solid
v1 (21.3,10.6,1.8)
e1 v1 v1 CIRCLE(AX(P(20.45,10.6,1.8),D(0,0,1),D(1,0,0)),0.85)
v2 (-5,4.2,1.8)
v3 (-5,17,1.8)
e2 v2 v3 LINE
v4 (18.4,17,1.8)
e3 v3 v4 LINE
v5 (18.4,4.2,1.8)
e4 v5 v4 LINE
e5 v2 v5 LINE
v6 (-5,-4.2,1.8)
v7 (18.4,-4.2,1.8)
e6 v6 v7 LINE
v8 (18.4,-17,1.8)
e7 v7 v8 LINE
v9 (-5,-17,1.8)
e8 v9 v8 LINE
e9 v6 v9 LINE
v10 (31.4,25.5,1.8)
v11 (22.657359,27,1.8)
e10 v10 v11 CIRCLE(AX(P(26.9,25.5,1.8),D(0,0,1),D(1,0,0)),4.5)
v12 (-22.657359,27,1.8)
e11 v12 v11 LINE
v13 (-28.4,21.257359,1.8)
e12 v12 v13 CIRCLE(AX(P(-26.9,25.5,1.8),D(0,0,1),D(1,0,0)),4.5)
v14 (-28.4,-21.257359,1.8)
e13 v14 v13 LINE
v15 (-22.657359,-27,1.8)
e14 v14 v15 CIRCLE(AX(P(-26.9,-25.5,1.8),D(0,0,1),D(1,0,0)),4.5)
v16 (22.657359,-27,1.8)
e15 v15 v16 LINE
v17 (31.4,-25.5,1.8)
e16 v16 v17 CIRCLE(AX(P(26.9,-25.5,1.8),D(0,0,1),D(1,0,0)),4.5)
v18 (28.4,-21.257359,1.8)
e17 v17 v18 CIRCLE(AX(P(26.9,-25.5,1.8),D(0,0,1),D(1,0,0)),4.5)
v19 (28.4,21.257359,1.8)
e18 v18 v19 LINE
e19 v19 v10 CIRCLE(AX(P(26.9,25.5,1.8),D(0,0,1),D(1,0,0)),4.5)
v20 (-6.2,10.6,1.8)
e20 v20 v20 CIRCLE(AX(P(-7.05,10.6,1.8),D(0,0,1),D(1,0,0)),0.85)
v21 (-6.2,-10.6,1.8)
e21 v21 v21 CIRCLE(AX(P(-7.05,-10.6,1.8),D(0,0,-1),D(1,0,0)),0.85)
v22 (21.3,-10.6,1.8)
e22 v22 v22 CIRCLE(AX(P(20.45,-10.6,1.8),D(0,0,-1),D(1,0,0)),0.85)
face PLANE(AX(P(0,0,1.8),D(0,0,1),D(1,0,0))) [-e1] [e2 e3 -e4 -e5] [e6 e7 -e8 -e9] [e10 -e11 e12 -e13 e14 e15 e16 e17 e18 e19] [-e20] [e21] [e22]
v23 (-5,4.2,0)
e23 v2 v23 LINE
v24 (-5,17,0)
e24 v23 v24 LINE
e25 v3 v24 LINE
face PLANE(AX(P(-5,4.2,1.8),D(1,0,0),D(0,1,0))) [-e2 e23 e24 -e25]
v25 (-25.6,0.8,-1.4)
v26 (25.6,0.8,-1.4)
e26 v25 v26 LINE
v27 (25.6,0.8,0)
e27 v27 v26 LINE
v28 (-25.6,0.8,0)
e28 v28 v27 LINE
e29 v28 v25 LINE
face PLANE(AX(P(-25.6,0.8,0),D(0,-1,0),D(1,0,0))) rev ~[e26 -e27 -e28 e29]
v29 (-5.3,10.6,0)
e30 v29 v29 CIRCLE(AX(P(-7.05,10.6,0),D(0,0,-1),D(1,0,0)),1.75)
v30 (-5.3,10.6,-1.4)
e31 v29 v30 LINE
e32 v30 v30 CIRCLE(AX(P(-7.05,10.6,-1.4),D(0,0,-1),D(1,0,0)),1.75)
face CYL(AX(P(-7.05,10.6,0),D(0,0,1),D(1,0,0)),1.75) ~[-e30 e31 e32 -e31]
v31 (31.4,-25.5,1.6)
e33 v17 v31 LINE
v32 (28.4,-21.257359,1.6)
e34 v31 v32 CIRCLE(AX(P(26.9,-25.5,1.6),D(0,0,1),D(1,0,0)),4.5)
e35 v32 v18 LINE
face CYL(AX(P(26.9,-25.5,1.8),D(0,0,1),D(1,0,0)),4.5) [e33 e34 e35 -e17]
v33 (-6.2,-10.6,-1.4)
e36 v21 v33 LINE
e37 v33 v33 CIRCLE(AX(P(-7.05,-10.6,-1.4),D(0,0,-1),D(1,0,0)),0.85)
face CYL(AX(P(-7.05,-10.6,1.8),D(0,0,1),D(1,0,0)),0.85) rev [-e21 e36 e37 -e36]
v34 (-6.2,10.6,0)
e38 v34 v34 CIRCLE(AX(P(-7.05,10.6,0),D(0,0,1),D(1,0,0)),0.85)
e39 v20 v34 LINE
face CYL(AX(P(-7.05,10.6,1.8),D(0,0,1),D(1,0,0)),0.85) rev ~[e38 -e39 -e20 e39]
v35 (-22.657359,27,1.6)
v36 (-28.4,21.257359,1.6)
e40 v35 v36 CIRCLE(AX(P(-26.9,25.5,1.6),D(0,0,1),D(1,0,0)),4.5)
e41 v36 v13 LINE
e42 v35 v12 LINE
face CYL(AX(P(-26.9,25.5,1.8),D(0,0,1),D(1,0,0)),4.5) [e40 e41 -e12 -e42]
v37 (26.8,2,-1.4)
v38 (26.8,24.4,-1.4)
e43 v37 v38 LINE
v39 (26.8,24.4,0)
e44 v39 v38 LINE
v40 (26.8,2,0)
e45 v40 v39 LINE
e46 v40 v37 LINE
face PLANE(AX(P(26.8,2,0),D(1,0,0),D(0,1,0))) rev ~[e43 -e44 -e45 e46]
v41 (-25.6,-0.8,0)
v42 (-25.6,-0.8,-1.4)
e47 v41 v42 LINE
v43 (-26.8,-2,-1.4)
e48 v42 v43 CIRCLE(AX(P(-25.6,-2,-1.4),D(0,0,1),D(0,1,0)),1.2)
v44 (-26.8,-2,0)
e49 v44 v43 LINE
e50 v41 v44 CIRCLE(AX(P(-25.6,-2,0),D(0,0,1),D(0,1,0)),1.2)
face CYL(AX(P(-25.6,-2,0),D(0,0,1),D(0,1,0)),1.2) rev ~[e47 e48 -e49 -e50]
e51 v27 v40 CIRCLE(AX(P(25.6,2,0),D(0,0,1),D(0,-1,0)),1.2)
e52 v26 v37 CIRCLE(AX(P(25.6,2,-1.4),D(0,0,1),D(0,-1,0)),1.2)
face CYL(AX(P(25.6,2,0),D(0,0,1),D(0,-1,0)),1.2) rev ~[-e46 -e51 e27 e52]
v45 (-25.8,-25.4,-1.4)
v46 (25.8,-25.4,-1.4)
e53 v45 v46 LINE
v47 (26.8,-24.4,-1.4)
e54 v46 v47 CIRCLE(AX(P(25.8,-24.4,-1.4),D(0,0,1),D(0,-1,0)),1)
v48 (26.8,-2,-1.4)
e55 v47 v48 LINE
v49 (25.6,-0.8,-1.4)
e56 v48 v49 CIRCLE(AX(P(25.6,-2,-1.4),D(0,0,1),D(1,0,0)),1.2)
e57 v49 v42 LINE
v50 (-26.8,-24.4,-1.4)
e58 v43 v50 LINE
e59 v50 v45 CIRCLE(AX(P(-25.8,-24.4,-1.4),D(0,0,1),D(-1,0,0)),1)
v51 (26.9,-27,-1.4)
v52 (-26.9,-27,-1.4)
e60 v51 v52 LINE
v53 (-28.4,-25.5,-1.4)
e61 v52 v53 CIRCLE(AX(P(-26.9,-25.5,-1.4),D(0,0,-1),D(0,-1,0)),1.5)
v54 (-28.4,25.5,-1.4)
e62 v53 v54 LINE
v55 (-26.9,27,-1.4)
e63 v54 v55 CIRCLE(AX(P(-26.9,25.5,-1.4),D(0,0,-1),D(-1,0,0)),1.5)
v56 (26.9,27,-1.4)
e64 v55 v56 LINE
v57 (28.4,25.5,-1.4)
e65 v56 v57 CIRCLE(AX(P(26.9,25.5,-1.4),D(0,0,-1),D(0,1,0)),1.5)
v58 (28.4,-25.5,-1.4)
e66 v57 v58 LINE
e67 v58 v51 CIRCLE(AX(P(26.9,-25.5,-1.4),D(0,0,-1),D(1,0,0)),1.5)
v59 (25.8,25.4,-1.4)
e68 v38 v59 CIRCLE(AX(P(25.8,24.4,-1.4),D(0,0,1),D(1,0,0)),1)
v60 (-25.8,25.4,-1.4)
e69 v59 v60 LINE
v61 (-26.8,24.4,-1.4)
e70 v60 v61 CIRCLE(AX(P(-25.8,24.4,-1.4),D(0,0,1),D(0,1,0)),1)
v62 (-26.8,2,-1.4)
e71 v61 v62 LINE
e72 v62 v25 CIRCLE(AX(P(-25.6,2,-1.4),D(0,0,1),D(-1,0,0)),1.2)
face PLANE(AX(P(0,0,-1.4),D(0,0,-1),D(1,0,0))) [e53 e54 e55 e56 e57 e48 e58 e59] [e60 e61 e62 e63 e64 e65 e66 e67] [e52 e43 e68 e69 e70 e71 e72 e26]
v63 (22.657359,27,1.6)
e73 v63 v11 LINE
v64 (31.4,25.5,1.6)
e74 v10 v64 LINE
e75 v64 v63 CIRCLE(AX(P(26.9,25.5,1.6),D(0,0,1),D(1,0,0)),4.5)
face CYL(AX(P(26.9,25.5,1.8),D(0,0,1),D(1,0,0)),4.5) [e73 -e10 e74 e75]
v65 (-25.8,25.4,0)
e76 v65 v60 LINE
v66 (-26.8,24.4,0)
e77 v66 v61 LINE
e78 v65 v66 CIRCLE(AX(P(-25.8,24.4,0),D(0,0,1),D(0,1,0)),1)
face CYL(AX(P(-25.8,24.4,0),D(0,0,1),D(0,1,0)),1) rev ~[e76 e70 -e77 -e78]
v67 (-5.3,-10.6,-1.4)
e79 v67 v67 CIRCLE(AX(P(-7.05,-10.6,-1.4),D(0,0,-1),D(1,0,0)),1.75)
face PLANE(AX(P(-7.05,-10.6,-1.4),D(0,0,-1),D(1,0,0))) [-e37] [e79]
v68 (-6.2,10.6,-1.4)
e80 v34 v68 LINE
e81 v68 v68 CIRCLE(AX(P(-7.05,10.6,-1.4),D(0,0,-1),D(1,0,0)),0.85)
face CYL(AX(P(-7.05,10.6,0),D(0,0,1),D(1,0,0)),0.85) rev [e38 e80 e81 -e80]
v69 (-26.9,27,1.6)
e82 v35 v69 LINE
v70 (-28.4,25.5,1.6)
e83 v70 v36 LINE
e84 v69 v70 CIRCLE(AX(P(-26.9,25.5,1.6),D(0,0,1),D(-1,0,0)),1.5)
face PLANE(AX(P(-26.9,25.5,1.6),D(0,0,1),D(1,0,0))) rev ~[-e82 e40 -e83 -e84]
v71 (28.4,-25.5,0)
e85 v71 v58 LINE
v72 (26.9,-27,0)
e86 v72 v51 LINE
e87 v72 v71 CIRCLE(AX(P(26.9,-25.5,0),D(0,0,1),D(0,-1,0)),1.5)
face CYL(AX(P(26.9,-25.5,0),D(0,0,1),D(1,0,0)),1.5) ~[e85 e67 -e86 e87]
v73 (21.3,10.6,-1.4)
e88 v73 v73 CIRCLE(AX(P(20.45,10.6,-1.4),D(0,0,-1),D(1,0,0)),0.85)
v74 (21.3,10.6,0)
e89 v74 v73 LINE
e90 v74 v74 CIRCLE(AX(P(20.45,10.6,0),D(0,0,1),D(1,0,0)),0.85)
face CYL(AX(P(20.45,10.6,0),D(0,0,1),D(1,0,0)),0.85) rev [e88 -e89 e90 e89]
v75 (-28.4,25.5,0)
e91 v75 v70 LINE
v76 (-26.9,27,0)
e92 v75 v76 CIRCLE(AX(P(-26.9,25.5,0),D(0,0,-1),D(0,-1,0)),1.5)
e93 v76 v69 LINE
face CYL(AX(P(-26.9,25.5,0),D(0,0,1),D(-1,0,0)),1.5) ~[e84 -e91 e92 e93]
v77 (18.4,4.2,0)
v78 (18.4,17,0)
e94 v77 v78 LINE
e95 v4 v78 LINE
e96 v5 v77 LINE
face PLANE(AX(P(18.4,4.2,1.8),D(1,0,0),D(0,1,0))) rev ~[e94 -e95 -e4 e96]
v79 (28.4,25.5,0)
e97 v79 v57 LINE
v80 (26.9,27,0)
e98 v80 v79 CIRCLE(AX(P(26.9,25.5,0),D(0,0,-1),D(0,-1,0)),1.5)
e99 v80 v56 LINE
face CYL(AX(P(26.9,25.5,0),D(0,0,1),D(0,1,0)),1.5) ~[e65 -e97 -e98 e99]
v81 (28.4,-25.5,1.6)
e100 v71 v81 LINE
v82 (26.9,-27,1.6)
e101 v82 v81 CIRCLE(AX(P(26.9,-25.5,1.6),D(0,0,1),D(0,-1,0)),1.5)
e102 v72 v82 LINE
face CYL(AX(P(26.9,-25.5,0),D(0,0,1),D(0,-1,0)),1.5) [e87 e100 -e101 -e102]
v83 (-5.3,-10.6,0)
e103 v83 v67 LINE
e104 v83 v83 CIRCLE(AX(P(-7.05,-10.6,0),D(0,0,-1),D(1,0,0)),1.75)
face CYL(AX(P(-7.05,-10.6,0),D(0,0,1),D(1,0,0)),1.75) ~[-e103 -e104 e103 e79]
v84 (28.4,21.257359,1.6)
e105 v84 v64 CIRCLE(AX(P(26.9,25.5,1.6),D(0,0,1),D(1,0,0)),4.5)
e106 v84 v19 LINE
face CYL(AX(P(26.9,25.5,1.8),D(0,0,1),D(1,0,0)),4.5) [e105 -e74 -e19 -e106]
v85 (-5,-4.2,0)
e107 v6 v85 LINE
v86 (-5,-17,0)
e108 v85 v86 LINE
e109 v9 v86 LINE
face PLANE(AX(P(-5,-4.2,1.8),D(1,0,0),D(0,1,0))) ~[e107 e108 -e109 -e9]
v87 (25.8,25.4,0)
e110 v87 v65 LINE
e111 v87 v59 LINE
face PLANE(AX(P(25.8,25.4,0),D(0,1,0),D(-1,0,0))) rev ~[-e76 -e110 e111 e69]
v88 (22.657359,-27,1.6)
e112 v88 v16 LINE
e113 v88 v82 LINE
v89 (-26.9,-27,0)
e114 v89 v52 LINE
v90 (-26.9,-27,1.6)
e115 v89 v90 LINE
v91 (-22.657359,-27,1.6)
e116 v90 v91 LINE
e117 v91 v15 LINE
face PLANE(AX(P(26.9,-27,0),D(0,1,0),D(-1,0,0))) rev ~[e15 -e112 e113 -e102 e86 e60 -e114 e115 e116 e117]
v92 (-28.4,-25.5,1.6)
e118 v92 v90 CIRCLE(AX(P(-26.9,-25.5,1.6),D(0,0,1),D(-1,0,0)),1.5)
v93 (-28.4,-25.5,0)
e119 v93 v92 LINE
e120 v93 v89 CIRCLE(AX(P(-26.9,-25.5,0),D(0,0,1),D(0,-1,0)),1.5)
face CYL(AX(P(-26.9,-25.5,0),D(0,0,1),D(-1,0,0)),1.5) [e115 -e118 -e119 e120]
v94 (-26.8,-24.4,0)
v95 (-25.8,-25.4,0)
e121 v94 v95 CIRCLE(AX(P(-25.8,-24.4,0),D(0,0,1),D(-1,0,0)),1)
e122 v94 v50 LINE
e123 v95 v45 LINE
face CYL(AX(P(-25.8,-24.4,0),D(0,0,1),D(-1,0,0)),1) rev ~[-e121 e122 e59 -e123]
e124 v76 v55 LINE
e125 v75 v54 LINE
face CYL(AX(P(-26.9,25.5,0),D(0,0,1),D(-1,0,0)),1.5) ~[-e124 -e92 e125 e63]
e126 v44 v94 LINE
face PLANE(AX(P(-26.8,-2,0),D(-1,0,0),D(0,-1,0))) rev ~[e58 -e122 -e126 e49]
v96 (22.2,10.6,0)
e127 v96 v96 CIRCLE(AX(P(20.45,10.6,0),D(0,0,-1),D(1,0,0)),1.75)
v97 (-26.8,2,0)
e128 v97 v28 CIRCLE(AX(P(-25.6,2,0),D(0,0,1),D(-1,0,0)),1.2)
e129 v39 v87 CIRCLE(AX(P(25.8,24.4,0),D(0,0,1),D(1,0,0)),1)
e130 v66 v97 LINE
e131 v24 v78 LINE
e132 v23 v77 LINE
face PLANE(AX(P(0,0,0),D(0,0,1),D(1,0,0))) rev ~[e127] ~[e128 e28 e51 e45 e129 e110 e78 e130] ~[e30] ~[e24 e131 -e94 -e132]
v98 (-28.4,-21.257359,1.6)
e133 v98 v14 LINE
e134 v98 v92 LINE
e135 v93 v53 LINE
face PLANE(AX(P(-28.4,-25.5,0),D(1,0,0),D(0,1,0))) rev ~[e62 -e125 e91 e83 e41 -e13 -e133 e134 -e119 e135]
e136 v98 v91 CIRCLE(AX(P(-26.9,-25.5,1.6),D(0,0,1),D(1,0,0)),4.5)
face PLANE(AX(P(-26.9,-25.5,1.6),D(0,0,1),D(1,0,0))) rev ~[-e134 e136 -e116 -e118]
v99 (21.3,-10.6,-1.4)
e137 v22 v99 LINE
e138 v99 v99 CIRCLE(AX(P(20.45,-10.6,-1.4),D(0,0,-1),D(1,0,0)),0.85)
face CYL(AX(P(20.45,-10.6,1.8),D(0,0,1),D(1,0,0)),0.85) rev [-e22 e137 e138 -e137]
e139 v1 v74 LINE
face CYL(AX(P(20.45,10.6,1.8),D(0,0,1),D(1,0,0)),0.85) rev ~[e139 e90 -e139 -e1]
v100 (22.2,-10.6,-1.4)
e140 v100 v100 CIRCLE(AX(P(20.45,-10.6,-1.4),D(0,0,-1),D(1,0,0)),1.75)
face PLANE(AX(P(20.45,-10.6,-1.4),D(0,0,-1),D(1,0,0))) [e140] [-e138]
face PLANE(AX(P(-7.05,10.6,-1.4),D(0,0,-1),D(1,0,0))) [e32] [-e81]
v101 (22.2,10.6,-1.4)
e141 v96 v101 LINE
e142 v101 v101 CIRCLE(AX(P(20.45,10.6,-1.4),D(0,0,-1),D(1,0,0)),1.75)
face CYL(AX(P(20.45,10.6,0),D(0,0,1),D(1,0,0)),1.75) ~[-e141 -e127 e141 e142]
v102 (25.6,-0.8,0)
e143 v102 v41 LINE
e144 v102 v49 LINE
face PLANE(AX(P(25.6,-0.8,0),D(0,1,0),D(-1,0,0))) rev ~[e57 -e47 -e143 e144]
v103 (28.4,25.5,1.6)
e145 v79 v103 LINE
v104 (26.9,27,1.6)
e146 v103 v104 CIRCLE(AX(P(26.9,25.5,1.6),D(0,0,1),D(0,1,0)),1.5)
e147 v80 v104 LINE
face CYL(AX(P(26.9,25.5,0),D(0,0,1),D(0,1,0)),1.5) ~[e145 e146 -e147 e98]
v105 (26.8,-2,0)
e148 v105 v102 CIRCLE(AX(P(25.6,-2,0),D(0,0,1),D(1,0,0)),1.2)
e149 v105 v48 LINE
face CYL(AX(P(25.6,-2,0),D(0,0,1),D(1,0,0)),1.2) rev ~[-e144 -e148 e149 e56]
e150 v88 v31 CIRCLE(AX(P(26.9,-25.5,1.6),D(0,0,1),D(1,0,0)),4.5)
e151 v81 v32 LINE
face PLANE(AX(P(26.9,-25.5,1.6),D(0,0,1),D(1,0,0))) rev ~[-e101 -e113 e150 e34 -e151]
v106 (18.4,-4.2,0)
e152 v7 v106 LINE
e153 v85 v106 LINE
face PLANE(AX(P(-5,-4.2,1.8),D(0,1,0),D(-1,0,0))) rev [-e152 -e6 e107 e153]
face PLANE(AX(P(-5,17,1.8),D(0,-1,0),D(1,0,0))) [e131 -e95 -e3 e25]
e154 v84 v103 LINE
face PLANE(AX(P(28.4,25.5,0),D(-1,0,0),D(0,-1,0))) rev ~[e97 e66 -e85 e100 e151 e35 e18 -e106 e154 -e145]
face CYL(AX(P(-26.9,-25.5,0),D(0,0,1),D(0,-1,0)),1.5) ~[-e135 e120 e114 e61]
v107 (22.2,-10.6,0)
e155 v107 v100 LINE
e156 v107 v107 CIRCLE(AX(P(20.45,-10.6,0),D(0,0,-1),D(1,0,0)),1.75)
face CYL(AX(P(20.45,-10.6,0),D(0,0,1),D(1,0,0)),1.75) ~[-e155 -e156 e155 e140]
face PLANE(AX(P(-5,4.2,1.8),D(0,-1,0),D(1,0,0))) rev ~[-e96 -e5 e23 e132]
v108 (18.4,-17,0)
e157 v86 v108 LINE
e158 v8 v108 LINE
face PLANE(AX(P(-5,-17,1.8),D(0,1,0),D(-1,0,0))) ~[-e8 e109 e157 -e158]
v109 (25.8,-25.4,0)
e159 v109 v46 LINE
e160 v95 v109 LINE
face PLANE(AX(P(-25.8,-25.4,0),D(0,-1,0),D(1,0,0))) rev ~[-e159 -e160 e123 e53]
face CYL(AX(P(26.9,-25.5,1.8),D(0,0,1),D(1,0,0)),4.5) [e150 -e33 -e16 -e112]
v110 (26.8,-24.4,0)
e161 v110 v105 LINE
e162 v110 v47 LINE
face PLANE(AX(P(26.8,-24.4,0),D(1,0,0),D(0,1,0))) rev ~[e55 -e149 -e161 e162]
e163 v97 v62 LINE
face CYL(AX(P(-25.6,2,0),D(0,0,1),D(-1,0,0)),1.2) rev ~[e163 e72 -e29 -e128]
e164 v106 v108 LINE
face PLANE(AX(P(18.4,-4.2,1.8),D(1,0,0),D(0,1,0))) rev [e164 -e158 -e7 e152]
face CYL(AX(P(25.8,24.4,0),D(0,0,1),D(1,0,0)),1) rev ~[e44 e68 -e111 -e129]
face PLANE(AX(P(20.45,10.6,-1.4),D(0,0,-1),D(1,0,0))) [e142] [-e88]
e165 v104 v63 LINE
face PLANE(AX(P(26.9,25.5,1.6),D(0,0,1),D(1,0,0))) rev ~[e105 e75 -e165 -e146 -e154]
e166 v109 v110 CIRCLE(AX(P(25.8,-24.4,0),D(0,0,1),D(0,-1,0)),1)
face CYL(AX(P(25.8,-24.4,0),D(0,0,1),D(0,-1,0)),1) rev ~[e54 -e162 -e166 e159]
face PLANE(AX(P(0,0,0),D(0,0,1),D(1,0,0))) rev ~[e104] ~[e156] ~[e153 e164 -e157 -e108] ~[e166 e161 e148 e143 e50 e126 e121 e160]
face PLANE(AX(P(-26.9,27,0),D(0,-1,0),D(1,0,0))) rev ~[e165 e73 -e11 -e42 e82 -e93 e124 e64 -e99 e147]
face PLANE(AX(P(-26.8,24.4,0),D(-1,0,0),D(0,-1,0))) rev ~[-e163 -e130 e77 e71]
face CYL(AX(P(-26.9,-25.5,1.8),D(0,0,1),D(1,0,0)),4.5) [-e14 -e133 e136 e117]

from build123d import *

# Parameters (mm, degrees)
F0_W     = 56.8
F0_H     = 54
F1_DEPTH = 1.8
F2_W     = 23.4
F2_H     = 12.8
F2_R     = 0.85
F3_DEPTH = 1.801
F4_R     = 1.5
F5_R     = 1.75
F5_R_2   = 0.85
F6_DEPTH = 1.4
F7_R     = 4.5
F8_DEPTH = 0.2


# Not quite as in the source:
# - a pattern or mirror of a feature is missing from the dataset's text; its kind, count and spacing are read off the source's solid


with BuildPart() as f1:
    # F0 (on Top) → F1 (new body)
    with BuildSketch(Plane.XY):
        Rectangle(F0_W, F0_H)
    extrude(amount=F1_DEPTH)

    # F2 (on face) → F3 (cut, through all)
    with BuildSketch(Plane.XY.offset(1.8)):
        with Locations((6.7, 10.6)):
            Rectangle(F2_W, F2_H)
        with Locations((-7.05, 10.6)):
            Circle(F2_R)
        with Locations((20.45, 10.6)):
            Circle(F2_R)
    f3 = extrude(amount=-F3_DEPTH, mode=Mode.SUBTRACT)

    # F3_copies: F3 across plane
    add(f3.mirror(Plane(origin=(0, 0, 0), x_dir=(0, 0, -1), z_dir=(0, -1, 0))), mode=Mode.SUBTRACT)

    # F4
    f4_edges = [f1.edges().sort_by_distance(p)[0] for p in [
        (28.4, 27, 0.9),
        (28.4, -27, 0.9),
        (-28.4, -27, 0.9),
        (-28.4, 27, 0.9),
    ]]
    fillet(f4_edges, radius=F4_R)

    # F5 (on face) → F6 (join)
    with BuildSketch(Plane(origin=(0, 0, 0), x_dir=(1, 0, 0), z_dir=(0, 0, -1))):
        with BuildLine():
            Line((-28.4, 25.5), (-28.4, -25.5))
            ThreePointArc((-28.4, -25.5), (-27.9606601718, -26.5606601718), (-26.9, -27))
            Line((-26.9, -27), (26.9, -27))
            ThreePointArc((26.9, -27), (27.9606601718, -26.5606601718), (28.4, -25.5))
            Line((28.4, -25.5), (28.4, 25.5))
            ThreePointArc((28.4, 25.5), (27.9606601718, 26.5606601718), (26.9, 27))
            Line((26.9, 27), (-26.9, 27))
            ThreePointArc((-26.9, 27), (-27.9606601718, 26.5606601718), (-28.4, 25.5))
        make_face()
        with BuildLine():
            Line((26.8, -2), (26.8, -24.4))
            ThreePointArc((26.8, -24.4), (26.5071067812, -25.1071067812), (25.8, -25.4))
            Line((25.8, -25.4), (-25.8, -25.4))
            ThreePointArc((-25.8, -25.4), (-26.5071067812, -25.1071067812), (-26.8, -24.4))
            Line((-26.8, -24.4), (-26.8, -2))
            Line((-26.8, -2), (-26.8, 2))
            Line((-26.8, 2), (-26.8, 24.4))
            ThreePointArc((-26.8, 24.4), (-26.5071067812, 25.1071067812), (-25.8, 25.4))
            Line((-25.8, 25.4), (25.8, 25.4))
            ThreePointArc((25.8, 25.4), (26.5071067812, 25.1071067812), (26.8, 24.4))
            Line((26.8, 24.4), (26.8, 2))
            Line((26.8, 2), (26.8, -2))
        make_face(mode=Mode.SUBTRACT)
        with Locations((-7.05, 10.6)):
            Circle(F5_R)
        with Locations((-7.05, 10.6)):
            Circle(F5_R_2, mode=Mode.SUBTRACT)
        with Locations((-7.05, -10.6)):
            Circle(F5_R)
        with Locations((-7.05, -10.6)):
            Circle(F5_R_2, mode=Mode.SUBTRACT)
        with Locations((20.45, 10.6)):
            Circle(F5_R)
        with Locations((20.45, 10.6)):
            Circle(F5_R_2, mode=Mode.SUBTRACT)
        with Locations((20.45, -10.6)):
            Circle(F5_R)
        with Locations((20.45, -10.6)):
            Circle(F5_R_2, mode=Mode.SUBTRACT)
        with BuildLine():
            ThreePointArc((25.6, -0.8), (26.4485281374, -1.1514718626), (26.8, -2))
            Line((26.8, -2), (26.8, 2))
            ThreePointArc((26.8, 2), (26.4485281374, 1.1514718626), (25.6, 0.8))
            Line((25.6, 0.8), (-25.6, 0.8))
            ThreePointArc((-25.6, 0.8), (-26.4485281374, 1.1514718626), (-26.8, 2))
            Line((-26.8, 2), (-26.8, -2))
            ThreePointArc((-26.8, -2), (-26.4485281374, -1.1514718626), (-25.6, -0.8))
            Line((-25.6, -0.8), (25.6, -0.8))
        make_face()
    extrude(amount=F6_DEPTH)

    # F7 (on face) → F8 (join)
    with BuildSketch(Plane.XY.offset(1.8)):
        with Locations((-26.9, 25.5)):
            Circle(F7_R)
        with Locations((-26.9, -25.5)):
            Circle(F7_R)
        with Locations((26.9, -25.5)):
            Circle(F7_R)
        with Locations((26.9, 25.5)):
            Circle(F7_R)
    extrude(amount=-F8_DEPTH)


solid = f1.part
